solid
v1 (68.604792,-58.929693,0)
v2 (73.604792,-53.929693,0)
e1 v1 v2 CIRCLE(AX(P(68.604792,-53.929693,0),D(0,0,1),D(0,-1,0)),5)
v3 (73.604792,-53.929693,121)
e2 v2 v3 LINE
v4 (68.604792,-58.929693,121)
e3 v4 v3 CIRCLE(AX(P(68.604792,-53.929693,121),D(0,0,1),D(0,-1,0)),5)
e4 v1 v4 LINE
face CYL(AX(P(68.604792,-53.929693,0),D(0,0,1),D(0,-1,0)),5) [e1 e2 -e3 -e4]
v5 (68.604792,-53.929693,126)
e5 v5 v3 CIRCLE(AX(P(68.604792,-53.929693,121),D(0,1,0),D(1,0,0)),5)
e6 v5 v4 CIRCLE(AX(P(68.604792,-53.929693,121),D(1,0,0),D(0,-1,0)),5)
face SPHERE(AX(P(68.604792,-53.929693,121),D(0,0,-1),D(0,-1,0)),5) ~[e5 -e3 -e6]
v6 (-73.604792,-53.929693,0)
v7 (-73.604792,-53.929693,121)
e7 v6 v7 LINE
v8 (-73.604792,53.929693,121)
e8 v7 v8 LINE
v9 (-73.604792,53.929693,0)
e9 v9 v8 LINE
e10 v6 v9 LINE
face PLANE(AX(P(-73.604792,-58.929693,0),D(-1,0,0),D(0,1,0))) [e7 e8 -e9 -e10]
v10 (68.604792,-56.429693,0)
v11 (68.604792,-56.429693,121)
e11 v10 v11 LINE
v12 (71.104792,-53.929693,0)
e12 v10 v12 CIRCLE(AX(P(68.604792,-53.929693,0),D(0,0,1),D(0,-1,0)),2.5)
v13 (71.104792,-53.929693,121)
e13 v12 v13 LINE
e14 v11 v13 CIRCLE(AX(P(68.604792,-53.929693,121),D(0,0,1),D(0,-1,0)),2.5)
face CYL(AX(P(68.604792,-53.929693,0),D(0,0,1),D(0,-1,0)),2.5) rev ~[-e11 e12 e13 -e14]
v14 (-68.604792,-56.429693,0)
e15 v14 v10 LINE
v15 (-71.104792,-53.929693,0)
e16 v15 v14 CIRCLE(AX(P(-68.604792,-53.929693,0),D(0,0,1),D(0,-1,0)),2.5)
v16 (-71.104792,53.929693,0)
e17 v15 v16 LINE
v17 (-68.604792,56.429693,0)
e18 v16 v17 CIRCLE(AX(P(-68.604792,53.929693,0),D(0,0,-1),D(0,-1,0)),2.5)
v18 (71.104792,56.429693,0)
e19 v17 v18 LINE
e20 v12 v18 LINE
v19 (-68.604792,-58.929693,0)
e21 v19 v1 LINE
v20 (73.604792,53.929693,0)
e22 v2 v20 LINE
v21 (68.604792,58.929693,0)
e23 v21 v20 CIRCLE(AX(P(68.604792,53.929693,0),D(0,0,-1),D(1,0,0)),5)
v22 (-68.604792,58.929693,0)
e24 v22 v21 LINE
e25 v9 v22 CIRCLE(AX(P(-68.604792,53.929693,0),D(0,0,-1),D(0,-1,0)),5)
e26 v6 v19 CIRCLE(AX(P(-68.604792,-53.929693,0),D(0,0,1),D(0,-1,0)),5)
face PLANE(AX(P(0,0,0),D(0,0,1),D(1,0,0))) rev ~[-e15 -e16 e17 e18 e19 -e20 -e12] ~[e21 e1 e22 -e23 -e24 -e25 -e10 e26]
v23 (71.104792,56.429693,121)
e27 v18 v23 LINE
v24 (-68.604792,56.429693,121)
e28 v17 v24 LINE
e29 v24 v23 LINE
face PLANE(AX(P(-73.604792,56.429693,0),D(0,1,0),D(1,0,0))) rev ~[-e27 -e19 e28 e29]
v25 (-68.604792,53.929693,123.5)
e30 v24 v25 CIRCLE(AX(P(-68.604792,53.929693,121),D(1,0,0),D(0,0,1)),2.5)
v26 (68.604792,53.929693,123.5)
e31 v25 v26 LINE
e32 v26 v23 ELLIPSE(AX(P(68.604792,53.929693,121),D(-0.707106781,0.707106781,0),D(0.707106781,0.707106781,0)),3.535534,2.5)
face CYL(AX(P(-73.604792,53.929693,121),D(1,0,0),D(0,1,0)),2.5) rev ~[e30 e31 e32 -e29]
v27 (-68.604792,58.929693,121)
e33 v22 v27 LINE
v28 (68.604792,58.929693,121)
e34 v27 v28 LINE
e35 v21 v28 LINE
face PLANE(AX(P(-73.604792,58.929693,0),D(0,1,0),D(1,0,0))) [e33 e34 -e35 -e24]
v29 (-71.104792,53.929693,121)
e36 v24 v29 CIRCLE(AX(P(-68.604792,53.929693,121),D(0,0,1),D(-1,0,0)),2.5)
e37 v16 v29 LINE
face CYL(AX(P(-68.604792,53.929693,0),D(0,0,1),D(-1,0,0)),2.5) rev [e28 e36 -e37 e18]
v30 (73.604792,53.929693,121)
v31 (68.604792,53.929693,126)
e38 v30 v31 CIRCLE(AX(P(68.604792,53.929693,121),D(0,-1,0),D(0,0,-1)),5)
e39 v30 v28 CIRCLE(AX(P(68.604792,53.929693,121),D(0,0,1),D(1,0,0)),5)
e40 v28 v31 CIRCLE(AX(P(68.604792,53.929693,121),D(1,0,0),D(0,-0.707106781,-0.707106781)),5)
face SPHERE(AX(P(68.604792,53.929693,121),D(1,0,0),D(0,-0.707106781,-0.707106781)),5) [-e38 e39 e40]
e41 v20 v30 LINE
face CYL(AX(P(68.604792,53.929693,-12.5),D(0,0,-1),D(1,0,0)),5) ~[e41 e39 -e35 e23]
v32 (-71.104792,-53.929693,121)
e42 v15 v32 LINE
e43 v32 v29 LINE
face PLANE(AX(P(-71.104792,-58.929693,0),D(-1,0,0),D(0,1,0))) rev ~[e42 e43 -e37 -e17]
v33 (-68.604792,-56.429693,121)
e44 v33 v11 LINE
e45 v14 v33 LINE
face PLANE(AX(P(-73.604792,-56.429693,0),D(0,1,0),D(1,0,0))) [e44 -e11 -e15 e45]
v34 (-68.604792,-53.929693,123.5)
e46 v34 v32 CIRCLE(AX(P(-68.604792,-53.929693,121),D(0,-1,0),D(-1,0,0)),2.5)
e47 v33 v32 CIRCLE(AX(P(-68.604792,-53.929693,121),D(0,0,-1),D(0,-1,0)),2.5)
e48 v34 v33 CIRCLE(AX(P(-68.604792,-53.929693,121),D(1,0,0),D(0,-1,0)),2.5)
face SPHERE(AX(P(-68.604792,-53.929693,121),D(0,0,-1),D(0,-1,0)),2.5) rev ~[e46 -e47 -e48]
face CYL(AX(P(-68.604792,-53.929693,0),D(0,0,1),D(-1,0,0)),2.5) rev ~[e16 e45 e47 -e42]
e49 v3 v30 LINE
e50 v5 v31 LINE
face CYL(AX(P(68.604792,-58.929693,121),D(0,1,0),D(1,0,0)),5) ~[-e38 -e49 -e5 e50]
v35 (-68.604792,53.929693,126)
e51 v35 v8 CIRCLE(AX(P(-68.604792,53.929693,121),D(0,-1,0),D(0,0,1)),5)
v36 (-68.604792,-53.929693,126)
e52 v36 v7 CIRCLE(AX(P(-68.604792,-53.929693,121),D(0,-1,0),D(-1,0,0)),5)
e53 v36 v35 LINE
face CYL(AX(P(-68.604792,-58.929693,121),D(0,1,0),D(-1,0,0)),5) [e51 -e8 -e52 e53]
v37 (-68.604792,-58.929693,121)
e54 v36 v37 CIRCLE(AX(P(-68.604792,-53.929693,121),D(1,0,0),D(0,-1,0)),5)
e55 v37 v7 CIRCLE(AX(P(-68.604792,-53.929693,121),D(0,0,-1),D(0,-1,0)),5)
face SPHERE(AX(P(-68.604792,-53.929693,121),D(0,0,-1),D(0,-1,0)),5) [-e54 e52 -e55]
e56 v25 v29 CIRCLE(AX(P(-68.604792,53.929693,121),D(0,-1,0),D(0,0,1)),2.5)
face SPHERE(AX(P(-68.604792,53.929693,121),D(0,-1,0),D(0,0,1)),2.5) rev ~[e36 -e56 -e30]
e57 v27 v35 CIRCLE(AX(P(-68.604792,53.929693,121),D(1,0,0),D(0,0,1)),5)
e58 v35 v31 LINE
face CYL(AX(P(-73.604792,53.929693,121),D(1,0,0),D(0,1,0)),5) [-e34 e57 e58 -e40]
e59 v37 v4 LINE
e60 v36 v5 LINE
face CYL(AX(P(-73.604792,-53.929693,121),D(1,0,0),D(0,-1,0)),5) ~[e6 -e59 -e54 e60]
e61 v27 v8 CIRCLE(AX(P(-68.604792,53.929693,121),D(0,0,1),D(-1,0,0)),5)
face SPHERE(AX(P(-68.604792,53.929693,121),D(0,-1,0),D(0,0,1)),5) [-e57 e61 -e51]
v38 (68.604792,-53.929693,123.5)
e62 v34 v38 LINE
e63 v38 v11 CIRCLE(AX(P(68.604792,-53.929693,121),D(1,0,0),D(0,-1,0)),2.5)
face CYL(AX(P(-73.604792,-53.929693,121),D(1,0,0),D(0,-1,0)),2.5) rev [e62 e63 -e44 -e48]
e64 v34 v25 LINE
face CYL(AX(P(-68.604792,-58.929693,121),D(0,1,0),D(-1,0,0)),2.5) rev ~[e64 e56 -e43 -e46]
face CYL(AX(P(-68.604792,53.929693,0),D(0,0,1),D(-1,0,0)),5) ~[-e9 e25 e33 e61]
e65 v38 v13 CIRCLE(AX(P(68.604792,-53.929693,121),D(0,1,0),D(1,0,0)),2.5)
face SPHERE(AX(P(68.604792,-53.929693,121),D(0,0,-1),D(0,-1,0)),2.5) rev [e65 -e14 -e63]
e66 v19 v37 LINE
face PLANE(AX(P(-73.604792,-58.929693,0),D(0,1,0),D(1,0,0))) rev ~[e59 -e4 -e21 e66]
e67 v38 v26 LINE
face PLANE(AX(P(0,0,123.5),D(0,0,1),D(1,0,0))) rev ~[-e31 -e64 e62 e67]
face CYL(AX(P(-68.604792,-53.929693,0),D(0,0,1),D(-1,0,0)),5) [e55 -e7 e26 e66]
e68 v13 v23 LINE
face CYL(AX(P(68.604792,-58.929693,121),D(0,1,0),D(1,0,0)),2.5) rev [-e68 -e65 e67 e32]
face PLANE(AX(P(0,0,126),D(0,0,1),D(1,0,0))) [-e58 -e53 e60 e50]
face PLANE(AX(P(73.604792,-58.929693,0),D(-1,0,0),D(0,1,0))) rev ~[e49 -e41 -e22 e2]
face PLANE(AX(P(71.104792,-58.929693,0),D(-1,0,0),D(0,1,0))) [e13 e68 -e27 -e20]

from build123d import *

# Parameters (mm, degrees)
F0_W        = 147.209584713
F0_H        = 117.8593859076
F1_DEPTH    = 126
F2_R        = 5
F3_T        = -2.5
F4_T1_DEPTH = 133.5
F4_S5_W     = 5
F4_S5_H     = 5
F4_T6_DEPTH = 5


# Not quite as in the source:
# - a fillet or chamfer that OpenCascade refuses, or shapes differently, is made with other operations: its cross-section is extruded or revolved along the edge and cut away or added


with BuildPart() as f1:
    # F0 (on Top) → F1 (new body)
    with BuildSketch(Plane.XY):
        Rectangle(F0_W, F0_H)
    extrude(amount=F1_DEPTH)

    # F2
    f2_edges = [f1.edges().sort_by_distance(p)[0] for p in [
        (-73.604792, -58.929693, 63),
        (73.604792, -58.929693, 63),
        (0, -58.929693, 126),
        (-73.604792, 0, 126),
        (0, 58.929693, 126),
        (73.604792, 0, 126),
        (-73.604792, 58.929693, 63),
    ]]
    fillet(f2_edges, radius=F2_R)

    # F3
    f3_openings = [f1.faces().sort_by_distance(p)[0] for p in [
        (0.022436, 0.017894, 0),
    ]]
    offset(amount=F3_T, openings=f3_openings)

    # F4: fillet of radius 5 on 1 edges, made by hand

    # F4_s2 → F4_t1 (cut)
    with BuildSketch(Plane.XY.offset(-12.5)):
        with BuildLine():
            ThreePointArc((73.6047923565, 53.9296929538), (72.1403262624, 57.4652268598), (68.6047923565, 58.9296929538))
            Line((68.6047923565, 58.9296929538), (73.6047923565, 58.9296929538))
            Line((73.6047923565, 58.9296929538), (73.6047923565, 53.9296929538))
        make_face()
    extrude(amount=F4_T1_DEPTH, mode=Mode.SUBTRACT)


with BuildPart() as f4_tool4:
    # F4_s5 → F4_t6 (new body)
    with BuildSketch(Plane.YZ.offset(68.6047923565)):
        with Locations((56.4296929538, 123.5)):
            Rectangle(F4_S5_W, F4_S5_H)
    extrude(amount=F4_T6_DEPTH)

    # F4_s7 → F4_t8 (revolve, cut)
    with BuildSketch(Plane(origin=(68.6047923565, 53.9296929538, 121), x_dir=(0, -0.7071067812, -0.7071067812), z_dir=(0, -0.7071067812, 0.7071067812))):
        with BuildLine():
            ThreePointArc((0, -5), (5, 0), (0, 5))
            Line((0, 5), (0, -5))
        make_face()
    revolve(axis=Axis((68.6047923565, 53.9296929538, 121), (1, 0, 0)), mode=Mode.SUBTRACT)


with BuildPart() as f1_1:
    add(f1.part)

    # F4_t3: cut F4_tool4
    add(f4_tool4.part, mode=Mode.SUBTRACT)


solid = f1_1.part
